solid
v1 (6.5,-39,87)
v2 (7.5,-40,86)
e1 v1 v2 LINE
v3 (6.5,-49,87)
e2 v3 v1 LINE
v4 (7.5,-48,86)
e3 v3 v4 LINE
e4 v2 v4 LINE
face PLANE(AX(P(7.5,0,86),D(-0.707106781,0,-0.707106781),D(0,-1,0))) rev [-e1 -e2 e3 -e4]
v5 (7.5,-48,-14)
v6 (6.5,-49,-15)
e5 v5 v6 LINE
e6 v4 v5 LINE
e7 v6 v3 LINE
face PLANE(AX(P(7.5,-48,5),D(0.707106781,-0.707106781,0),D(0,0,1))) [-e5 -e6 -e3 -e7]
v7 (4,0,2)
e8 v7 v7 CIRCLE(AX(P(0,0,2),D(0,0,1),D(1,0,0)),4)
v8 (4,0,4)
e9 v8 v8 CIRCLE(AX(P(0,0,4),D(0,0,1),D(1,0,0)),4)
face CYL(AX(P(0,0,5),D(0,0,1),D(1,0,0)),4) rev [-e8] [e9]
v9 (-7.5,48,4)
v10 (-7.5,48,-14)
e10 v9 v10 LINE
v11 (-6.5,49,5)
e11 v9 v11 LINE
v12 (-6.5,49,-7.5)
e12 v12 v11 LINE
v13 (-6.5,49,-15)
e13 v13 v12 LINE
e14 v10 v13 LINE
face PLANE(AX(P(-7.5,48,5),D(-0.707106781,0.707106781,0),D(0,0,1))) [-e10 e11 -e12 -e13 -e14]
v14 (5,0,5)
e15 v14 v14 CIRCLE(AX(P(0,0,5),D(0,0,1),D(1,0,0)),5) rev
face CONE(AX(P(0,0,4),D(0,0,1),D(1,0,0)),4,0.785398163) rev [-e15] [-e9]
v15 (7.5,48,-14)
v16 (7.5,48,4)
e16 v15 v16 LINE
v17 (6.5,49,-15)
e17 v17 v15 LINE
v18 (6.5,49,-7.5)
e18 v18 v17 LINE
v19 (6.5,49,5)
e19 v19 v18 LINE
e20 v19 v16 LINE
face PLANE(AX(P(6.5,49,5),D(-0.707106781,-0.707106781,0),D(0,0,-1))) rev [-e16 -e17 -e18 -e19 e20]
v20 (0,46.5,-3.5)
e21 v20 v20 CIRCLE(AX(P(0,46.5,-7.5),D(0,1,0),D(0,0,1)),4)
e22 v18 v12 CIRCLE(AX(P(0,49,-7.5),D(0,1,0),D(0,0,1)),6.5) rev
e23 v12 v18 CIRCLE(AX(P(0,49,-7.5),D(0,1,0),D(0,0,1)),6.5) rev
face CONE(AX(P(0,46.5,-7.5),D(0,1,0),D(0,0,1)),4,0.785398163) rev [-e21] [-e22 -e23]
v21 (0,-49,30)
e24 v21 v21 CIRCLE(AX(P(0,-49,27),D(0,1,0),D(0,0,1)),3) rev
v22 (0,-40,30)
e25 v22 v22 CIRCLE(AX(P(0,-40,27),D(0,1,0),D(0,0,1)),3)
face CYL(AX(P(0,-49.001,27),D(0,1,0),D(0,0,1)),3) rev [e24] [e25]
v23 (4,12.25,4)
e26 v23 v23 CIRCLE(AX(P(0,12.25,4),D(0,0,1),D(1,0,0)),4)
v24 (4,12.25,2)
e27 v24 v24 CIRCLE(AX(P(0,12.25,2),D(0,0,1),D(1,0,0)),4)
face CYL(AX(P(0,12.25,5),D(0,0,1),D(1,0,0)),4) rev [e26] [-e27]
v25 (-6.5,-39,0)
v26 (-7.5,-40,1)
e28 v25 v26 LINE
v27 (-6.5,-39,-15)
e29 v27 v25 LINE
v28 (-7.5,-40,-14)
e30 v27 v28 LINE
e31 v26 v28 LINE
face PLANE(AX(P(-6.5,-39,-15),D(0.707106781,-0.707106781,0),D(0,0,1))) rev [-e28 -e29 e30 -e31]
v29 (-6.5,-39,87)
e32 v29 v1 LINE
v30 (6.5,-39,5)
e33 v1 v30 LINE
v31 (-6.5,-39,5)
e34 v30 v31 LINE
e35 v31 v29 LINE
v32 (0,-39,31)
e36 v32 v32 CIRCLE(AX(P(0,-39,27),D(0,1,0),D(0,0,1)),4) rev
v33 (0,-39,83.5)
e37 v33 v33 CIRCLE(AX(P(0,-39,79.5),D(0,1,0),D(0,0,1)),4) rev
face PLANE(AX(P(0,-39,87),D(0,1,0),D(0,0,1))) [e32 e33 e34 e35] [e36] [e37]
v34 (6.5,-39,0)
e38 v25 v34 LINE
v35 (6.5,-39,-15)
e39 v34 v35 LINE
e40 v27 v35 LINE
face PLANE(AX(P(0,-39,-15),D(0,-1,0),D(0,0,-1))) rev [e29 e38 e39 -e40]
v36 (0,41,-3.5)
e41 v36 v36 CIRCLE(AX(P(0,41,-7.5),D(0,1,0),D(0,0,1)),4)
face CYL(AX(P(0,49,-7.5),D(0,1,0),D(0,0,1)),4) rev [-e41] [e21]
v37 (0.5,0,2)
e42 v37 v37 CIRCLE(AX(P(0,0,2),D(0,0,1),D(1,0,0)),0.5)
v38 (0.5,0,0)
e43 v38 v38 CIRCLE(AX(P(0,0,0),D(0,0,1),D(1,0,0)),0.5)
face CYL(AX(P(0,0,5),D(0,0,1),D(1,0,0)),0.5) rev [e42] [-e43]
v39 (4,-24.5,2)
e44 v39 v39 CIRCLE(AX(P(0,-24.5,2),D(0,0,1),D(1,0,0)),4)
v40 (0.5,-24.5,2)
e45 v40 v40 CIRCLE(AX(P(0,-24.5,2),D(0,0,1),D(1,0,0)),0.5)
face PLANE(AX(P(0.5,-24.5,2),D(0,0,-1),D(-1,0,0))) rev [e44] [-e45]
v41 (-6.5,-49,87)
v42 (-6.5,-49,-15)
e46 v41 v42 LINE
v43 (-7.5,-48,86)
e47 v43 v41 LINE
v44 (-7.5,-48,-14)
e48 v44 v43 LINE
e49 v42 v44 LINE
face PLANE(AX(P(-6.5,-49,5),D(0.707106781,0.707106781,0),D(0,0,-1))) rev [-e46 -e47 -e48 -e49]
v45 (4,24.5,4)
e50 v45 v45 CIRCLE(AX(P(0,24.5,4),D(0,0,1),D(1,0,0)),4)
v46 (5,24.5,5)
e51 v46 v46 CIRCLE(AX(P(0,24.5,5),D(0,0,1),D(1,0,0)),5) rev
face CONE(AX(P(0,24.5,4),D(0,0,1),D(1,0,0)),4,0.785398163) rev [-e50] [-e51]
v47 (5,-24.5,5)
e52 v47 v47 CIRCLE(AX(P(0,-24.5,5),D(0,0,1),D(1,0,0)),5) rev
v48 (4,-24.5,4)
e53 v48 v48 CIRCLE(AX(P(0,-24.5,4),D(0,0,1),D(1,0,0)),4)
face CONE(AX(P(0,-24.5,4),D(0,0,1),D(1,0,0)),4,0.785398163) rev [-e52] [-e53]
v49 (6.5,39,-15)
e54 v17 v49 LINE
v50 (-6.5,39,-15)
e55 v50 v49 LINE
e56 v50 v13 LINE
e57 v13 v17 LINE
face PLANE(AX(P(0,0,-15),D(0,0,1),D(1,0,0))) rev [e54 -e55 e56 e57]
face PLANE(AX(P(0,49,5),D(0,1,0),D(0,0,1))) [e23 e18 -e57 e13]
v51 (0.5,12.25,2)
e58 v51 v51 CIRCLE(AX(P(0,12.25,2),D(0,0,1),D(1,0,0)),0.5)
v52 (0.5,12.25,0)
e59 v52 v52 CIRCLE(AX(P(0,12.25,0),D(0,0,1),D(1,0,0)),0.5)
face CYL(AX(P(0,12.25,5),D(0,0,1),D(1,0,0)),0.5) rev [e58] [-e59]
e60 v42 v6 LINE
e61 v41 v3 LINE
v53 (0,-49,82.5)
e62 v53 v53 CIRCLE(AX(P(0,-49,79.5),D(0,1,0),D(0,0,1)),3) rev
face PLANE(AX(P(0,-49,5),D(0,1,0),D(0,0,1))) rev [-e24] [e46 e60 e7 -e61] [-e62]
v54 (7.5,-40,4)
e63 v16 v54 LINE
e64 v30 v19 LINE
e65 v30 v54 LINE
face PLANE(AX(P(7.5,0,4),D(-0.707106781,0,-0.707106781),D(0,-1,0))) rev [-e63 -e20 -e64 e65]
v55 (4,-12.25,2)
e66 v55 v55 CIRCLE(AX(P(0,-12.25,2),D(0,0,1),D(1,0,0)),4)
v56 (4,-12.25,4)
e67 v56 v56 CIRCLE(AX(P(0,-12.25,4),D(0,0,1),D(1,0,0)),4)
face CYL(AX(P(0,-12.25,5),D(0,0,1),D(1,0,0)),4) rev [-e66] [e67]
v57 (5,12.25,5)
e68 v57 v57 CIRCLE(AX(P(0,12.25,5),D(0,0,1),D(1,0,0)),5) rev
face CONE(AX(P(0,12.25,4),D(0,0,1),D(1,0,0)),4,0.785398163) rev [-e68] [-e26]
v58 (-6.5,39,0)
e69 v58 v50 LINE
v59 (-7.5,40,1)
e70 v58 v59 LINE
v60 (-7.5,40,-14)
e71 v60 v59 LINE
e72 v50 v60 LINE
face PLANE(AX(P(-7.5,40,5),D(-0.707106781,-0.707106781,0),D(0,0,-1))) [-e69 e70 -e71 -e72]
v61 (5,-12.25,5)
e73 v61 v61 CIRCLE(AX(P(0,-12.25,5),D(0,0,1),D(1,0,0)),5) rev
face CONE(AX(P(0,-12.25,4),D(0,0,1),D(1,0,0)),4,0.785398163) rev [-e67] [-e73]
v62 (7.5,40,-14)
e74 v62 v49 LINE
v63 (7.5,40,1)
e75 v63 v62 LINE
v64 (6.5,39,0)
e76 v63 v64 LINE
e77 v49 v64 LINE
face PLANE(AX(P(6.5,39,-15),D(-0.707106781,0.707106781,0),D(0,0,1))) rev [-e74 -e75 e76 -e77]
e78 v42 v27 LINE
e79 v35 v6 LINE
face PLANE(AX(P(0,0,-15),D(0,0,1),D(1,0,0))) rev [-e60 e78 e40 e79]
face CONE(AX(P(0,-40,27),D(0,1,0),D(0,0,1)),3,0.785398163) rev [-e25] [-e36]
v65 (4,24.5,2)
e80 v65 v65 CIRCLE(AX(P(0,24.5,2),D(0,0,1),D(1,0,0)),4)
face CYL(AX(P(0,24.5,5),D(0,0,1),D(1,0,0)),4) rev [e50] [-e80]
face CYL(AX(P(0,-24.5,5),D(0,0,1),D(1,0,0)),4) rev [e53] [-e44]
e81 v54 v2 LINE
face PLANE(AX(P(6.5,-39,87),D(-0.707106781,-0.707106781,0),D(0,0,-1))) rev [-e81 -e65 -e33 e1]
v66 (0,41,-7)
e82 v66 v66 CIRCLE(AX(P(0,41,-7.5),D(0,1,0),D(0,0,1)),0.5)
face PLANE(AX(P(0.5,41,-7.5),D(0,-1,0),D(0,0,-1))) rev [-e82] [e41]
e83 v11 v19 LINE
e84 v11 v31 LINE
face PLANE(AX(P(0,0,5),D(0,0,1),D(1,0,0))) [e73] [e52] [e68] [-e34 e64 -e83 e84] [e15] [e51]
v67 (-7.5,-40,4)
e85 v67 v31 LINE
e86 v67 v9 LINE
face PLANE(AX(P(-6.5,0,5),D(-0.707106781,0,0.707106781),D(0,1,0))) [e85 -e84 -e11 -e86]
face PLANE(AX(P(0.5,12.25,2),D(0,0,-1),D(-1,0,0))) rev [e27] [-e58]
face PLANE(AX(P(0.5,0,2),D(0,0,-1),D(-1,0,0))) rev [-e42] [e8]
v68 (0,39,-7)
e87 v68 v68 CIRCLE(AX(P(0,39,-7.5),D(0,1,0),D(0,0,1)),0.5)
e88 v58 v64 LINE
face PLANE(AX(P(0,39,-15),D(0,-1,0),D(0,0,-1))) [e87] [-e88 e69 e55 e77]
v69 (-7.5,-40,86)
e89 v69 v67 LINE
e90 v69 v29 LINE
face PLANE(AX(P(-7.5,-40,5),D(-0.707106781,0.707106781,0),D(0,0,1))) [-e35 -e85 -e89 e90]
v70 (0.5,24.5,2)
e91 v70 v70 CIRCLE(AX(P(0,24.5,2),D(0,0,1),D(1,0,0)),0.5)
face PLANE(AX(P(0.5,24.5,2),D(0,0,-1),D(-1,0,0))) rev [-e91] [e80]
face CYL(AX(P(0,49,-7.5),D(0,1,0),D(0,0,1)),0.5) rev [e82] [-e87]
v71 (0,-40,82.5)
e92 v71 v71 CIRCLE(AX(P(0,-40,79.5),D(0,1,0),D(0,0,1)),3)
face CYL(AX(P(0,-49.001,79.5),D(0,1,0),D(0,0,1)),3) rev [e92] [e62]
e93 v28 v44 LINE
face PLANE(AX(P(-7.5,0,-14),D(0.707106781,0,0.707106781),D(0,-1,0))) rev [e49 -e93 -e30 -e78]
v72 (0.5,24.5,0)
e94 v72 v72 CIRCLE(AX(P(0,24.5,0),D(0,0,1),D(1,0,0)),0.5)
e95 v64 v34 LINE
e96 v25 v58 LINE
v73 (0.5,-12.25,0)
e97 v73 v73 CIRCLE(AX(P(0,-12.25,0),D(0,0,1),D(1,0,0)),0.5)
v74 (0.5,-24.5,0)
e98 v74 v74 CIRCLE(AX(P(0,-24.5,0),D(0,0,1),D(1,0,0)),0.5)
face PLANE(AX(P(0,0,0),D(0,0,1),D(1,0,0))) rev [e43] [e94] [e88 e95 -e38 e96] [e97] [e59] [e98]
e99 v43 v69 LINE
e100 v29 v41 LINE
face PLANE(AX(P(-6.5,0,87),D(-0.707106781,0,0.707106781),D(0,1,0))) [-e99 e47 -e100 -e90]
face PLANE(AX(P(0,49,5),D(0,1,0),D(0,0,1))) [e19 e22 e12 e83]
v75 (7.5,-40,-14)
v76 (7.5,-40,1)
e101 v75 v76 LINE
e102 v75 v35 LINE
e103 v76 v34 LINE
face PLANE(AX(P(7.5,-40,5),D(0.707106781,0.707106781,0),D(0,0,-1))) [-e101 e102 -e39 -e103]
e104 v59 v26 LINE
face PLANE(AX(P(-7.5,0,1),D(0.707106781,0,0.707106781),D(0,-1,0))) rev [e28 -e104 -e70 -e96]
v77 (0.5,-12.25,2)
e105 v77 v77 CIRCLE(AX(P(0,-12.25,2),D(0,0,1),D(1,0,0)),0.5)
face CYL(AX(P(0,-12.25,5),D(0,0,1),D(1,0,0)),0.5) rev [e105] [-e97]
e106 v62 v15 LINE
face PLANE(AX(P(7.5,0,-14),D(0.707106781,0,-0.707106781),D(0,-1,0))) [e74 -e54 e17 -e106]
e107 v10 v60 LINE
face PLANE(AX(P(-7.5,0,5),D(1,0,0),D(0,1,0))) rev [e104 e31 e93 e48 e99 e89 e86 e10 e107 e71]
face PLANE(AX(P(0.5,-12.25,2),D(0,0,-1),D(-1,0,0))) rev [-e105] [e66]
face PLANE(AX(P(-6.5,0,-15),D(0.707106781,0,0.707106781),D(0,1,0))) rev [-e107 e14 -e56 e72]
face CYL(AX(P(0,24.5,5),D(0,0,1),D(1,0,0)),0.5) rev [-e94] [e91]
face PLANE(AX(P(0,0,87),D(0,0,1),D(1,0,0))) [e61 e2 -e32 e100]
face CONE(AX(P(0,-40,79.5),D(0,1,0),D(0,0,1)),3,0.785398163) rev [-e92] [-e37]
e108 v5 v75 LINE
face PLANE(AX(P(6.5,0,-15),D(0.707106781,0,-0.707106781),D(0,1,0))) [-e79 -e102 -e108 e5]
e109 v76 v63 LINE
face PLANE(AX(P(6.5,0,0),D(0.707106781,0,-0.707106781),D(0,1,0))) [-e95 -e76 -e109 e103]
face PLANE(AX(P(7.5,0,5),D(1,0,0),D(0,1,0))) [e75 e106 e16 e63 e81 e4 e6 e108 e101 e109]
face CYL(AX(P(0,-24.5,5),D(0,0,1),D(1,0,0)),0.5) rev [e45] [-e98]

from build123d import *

# Parameters (mm, degrees)
SKETCH1_W           = 15
SKETCH1_H           = 10
SKETCH1_H_2         = 78
BOSS_EXTRUDE1_DEPTH = 5
SKETCH1_3_W         = 15
SKETCH1_3_H         = 10
BOSS_EXTRUDE2_DEPTH = 15
HOLE1_D             = 1
HOLE1_CBORE_D       = 8
HOLE1_CBORE_DEPTH   = 3
SKETCH1_4_W         = 15
SKETCH1_4_H         = 10
BOSS_EXTRUDE3_DEPTH = 87
HOLE2_START         = 41
HOLE2_OUTLINE_R     = 4
HOLE2_DEPTH         = 8
HOLE2_START_2       = 39
HOLE2_2_OUTLINE_R   = 0.5
HOLE2_2_DEPTH       = 2
CUT_EXTRUDE1_REACH  = 125.973
SKETCH9_R           = 3
CHAMFER1_SIZE       = 2.5
CHAMFER2_SIZE       = 1
CHAMFER3_SIZE       = 1


# Read off the part's stored shape, not the designer's step: Hole2
with BuildPart() as part:
    # Sketch1 → Boss-Extrude1 (new body)
    with BuildSketch(Plane.XY):
        with Locations((0, -44)):
            Rectangle(SKETCH1_W, SKETCH1_H)
        Rectangle(SKETCH1_W, SKETCH1_H_2)
        with Locations((0, 44)):
            Rectangle(SKETCH1_W, SKETCH1_H)
    extrude(amount=BOSS_EXTRUDE1_DEPTH)

    # Sketch1<3> → Boss-Extrude2 (add)
    with BuildSketch(Plane.XY):
        with Locations((0, -44)):
            Rectangle(SKETCH1_3_W, SKETCH1_3_H)
        with Locations((0, 44)):
            Rectangle(SKETCH1_3_W, SKETCH1_3_H)
    extrude(amount=-BOSS_EXTRUDE2_DEPTH)

    # Hole1 (through all)
    with Locations(Plane.XY.offset(5)):
        with Locations((0, 24.5), (0, 12.25), (0, 0), (0, -12.25), (0, -24.5)):
            CounterBoreHole(HOLE1_D / 2, HOLE1_CBORE_D / 2, HOLE1_CBORE_DEPTH)

    # Sketch1<4> → Boss-Extrude3 (add)
    with BuildSketch(Plane.XY):
        with Locations((0, -44)):
            Rectangle(SKETCH1_4_W, SKETCH1_4_H)
    extrude(amount=BOSS_EXTRUDE3_DEPTH)

    # Hole2 outline → Hole2 (cut)
    with BuildSketch(Plane(origin=(0, 0, 0), x_dir=(1, 0, 0), z_dir=(0, 1, 0)).offset(HOLE2_START)):
        with Locations((0, 7.5)):
            Circle(HOLE2_OUTLINE_R)
    extrude(amount=HOLE2_DEPTH, mode=Mode.SUBTRACT)

    # Hole2 2 outline → Hole2 2 (cut)
    with BuildSketch(Plane(origin=(0, 0, 0), x_dir=(1, 0, 0), z_dir=(0, 1, 0)).offset(HOLE2_START_2)):
        with Locations((0, 7.5)):
            Circle(HOLE2_2_OUTLINE_R)
    extrude(amount=HOLE2_2_DEPTH, mode=Mode.SUBTRACT)

    # Sketch9 → Cut-Extrude1 (cut, up to next)
    with BuildSketch(Plane(origin=(0, -39, 0), x_dir=(1, 0, 0), z_dir=(0, 1, 0)), mode=Mode.PRIVATE) as cut_extrude1_sk1:
        with Locations(Location((0, -27, 0), (0, 0, 270))):
            Circle(SKETCH9_R)
    cut_extrude1_tool1 = extrude(cut_extrude1_sk1.sketch, amount=-CUT_EXTRUDE1_REACH, mode=Mode.PRIVATE) & part.part
    # Sketch9 → Cut-Extrude1 (cut, up to next)
    with BuildSketch(Plane(origin=(0, -39, 0), x_dir=(1, 0, 0), z_dir=(0, 1, 0)), mode=Mode.PRIVATE) as cut_extrude1_sk2:
        with Locations(Location((0, -79.5, 0), (0, 0, 270))):
            Circle(SKETCH9_R)
    cut_extrude1_tool2 = extrude(cut_extrude1_sk2.sketch, amount=-CUT_EXTRUDE1_REACH, mode=Mode.PRIVATE) & part.part
    add(cut_extrude1_tool1.solids().sort_by_distance((0, -39, 27))[0], mode=Mode.SUBTRACT)
    add(cut_extrude1_tool2.solids().sort_by_distance((0, -39, 79.5))[0], mode=Mode.SUBTRACT)

    # Chamfer1
    chamfer1_edges = [part.edges().sort_by_distance(p)[0] for p in [
        (-4, 49, -7.5),
    ]]
    chamfer(chamfer1_edges, length=CHAMFER1_SIZE)

    # Chamfer2
    chamfer2_edges = [part.edges().sort_by_distance(p)[0] for p in [
        (0, -39, 76.5),
        (0, -39, 24),
        (-4, -24.5, 5),
        (-4, -12.25, 5),
        (-4, 0, 5),
        (-4, 12.25, 5),
        (-4, 24.5, 5),
    ]]
    chamfer(chamfer2_edges, length=CHAMFER2_SIZE)

    # Chamfer3
    chamfer3_edges = [part.edges().sort_by_distance(p)[0] for p in [
        (7.5, -49, 36),
        (-7.5, -39, 46),
        (-7.5, -44, 87),
        (-7.5, -49, 36),
        (-7.5, 49, -5),
        (7.5, 49, -5),
        (-7.5, 5, 5),
        (7.5, -39, -7.5),
        (-7.5, -44, -15),
        (-7.5, -39, -7.5),
        (7.5, -44, -15),
        (-7.5, 0, 0),
        (7.5, 0, 0),
        (7.5, 39, -7.5),
        (-7.5, 39, -7.5),
        (7.5, 44, -15),
        (-7.5, 44, -15),
        (7.5, 5, 5),
        (7.5, -44, 87),
        (7.5, -39, 46),
    ]]
    chamfer(chamfer3_edges, length=CHAMFER3_SIZE - 0.0001)  # a hair under: the kernel refuses the full size


solid = part.part
